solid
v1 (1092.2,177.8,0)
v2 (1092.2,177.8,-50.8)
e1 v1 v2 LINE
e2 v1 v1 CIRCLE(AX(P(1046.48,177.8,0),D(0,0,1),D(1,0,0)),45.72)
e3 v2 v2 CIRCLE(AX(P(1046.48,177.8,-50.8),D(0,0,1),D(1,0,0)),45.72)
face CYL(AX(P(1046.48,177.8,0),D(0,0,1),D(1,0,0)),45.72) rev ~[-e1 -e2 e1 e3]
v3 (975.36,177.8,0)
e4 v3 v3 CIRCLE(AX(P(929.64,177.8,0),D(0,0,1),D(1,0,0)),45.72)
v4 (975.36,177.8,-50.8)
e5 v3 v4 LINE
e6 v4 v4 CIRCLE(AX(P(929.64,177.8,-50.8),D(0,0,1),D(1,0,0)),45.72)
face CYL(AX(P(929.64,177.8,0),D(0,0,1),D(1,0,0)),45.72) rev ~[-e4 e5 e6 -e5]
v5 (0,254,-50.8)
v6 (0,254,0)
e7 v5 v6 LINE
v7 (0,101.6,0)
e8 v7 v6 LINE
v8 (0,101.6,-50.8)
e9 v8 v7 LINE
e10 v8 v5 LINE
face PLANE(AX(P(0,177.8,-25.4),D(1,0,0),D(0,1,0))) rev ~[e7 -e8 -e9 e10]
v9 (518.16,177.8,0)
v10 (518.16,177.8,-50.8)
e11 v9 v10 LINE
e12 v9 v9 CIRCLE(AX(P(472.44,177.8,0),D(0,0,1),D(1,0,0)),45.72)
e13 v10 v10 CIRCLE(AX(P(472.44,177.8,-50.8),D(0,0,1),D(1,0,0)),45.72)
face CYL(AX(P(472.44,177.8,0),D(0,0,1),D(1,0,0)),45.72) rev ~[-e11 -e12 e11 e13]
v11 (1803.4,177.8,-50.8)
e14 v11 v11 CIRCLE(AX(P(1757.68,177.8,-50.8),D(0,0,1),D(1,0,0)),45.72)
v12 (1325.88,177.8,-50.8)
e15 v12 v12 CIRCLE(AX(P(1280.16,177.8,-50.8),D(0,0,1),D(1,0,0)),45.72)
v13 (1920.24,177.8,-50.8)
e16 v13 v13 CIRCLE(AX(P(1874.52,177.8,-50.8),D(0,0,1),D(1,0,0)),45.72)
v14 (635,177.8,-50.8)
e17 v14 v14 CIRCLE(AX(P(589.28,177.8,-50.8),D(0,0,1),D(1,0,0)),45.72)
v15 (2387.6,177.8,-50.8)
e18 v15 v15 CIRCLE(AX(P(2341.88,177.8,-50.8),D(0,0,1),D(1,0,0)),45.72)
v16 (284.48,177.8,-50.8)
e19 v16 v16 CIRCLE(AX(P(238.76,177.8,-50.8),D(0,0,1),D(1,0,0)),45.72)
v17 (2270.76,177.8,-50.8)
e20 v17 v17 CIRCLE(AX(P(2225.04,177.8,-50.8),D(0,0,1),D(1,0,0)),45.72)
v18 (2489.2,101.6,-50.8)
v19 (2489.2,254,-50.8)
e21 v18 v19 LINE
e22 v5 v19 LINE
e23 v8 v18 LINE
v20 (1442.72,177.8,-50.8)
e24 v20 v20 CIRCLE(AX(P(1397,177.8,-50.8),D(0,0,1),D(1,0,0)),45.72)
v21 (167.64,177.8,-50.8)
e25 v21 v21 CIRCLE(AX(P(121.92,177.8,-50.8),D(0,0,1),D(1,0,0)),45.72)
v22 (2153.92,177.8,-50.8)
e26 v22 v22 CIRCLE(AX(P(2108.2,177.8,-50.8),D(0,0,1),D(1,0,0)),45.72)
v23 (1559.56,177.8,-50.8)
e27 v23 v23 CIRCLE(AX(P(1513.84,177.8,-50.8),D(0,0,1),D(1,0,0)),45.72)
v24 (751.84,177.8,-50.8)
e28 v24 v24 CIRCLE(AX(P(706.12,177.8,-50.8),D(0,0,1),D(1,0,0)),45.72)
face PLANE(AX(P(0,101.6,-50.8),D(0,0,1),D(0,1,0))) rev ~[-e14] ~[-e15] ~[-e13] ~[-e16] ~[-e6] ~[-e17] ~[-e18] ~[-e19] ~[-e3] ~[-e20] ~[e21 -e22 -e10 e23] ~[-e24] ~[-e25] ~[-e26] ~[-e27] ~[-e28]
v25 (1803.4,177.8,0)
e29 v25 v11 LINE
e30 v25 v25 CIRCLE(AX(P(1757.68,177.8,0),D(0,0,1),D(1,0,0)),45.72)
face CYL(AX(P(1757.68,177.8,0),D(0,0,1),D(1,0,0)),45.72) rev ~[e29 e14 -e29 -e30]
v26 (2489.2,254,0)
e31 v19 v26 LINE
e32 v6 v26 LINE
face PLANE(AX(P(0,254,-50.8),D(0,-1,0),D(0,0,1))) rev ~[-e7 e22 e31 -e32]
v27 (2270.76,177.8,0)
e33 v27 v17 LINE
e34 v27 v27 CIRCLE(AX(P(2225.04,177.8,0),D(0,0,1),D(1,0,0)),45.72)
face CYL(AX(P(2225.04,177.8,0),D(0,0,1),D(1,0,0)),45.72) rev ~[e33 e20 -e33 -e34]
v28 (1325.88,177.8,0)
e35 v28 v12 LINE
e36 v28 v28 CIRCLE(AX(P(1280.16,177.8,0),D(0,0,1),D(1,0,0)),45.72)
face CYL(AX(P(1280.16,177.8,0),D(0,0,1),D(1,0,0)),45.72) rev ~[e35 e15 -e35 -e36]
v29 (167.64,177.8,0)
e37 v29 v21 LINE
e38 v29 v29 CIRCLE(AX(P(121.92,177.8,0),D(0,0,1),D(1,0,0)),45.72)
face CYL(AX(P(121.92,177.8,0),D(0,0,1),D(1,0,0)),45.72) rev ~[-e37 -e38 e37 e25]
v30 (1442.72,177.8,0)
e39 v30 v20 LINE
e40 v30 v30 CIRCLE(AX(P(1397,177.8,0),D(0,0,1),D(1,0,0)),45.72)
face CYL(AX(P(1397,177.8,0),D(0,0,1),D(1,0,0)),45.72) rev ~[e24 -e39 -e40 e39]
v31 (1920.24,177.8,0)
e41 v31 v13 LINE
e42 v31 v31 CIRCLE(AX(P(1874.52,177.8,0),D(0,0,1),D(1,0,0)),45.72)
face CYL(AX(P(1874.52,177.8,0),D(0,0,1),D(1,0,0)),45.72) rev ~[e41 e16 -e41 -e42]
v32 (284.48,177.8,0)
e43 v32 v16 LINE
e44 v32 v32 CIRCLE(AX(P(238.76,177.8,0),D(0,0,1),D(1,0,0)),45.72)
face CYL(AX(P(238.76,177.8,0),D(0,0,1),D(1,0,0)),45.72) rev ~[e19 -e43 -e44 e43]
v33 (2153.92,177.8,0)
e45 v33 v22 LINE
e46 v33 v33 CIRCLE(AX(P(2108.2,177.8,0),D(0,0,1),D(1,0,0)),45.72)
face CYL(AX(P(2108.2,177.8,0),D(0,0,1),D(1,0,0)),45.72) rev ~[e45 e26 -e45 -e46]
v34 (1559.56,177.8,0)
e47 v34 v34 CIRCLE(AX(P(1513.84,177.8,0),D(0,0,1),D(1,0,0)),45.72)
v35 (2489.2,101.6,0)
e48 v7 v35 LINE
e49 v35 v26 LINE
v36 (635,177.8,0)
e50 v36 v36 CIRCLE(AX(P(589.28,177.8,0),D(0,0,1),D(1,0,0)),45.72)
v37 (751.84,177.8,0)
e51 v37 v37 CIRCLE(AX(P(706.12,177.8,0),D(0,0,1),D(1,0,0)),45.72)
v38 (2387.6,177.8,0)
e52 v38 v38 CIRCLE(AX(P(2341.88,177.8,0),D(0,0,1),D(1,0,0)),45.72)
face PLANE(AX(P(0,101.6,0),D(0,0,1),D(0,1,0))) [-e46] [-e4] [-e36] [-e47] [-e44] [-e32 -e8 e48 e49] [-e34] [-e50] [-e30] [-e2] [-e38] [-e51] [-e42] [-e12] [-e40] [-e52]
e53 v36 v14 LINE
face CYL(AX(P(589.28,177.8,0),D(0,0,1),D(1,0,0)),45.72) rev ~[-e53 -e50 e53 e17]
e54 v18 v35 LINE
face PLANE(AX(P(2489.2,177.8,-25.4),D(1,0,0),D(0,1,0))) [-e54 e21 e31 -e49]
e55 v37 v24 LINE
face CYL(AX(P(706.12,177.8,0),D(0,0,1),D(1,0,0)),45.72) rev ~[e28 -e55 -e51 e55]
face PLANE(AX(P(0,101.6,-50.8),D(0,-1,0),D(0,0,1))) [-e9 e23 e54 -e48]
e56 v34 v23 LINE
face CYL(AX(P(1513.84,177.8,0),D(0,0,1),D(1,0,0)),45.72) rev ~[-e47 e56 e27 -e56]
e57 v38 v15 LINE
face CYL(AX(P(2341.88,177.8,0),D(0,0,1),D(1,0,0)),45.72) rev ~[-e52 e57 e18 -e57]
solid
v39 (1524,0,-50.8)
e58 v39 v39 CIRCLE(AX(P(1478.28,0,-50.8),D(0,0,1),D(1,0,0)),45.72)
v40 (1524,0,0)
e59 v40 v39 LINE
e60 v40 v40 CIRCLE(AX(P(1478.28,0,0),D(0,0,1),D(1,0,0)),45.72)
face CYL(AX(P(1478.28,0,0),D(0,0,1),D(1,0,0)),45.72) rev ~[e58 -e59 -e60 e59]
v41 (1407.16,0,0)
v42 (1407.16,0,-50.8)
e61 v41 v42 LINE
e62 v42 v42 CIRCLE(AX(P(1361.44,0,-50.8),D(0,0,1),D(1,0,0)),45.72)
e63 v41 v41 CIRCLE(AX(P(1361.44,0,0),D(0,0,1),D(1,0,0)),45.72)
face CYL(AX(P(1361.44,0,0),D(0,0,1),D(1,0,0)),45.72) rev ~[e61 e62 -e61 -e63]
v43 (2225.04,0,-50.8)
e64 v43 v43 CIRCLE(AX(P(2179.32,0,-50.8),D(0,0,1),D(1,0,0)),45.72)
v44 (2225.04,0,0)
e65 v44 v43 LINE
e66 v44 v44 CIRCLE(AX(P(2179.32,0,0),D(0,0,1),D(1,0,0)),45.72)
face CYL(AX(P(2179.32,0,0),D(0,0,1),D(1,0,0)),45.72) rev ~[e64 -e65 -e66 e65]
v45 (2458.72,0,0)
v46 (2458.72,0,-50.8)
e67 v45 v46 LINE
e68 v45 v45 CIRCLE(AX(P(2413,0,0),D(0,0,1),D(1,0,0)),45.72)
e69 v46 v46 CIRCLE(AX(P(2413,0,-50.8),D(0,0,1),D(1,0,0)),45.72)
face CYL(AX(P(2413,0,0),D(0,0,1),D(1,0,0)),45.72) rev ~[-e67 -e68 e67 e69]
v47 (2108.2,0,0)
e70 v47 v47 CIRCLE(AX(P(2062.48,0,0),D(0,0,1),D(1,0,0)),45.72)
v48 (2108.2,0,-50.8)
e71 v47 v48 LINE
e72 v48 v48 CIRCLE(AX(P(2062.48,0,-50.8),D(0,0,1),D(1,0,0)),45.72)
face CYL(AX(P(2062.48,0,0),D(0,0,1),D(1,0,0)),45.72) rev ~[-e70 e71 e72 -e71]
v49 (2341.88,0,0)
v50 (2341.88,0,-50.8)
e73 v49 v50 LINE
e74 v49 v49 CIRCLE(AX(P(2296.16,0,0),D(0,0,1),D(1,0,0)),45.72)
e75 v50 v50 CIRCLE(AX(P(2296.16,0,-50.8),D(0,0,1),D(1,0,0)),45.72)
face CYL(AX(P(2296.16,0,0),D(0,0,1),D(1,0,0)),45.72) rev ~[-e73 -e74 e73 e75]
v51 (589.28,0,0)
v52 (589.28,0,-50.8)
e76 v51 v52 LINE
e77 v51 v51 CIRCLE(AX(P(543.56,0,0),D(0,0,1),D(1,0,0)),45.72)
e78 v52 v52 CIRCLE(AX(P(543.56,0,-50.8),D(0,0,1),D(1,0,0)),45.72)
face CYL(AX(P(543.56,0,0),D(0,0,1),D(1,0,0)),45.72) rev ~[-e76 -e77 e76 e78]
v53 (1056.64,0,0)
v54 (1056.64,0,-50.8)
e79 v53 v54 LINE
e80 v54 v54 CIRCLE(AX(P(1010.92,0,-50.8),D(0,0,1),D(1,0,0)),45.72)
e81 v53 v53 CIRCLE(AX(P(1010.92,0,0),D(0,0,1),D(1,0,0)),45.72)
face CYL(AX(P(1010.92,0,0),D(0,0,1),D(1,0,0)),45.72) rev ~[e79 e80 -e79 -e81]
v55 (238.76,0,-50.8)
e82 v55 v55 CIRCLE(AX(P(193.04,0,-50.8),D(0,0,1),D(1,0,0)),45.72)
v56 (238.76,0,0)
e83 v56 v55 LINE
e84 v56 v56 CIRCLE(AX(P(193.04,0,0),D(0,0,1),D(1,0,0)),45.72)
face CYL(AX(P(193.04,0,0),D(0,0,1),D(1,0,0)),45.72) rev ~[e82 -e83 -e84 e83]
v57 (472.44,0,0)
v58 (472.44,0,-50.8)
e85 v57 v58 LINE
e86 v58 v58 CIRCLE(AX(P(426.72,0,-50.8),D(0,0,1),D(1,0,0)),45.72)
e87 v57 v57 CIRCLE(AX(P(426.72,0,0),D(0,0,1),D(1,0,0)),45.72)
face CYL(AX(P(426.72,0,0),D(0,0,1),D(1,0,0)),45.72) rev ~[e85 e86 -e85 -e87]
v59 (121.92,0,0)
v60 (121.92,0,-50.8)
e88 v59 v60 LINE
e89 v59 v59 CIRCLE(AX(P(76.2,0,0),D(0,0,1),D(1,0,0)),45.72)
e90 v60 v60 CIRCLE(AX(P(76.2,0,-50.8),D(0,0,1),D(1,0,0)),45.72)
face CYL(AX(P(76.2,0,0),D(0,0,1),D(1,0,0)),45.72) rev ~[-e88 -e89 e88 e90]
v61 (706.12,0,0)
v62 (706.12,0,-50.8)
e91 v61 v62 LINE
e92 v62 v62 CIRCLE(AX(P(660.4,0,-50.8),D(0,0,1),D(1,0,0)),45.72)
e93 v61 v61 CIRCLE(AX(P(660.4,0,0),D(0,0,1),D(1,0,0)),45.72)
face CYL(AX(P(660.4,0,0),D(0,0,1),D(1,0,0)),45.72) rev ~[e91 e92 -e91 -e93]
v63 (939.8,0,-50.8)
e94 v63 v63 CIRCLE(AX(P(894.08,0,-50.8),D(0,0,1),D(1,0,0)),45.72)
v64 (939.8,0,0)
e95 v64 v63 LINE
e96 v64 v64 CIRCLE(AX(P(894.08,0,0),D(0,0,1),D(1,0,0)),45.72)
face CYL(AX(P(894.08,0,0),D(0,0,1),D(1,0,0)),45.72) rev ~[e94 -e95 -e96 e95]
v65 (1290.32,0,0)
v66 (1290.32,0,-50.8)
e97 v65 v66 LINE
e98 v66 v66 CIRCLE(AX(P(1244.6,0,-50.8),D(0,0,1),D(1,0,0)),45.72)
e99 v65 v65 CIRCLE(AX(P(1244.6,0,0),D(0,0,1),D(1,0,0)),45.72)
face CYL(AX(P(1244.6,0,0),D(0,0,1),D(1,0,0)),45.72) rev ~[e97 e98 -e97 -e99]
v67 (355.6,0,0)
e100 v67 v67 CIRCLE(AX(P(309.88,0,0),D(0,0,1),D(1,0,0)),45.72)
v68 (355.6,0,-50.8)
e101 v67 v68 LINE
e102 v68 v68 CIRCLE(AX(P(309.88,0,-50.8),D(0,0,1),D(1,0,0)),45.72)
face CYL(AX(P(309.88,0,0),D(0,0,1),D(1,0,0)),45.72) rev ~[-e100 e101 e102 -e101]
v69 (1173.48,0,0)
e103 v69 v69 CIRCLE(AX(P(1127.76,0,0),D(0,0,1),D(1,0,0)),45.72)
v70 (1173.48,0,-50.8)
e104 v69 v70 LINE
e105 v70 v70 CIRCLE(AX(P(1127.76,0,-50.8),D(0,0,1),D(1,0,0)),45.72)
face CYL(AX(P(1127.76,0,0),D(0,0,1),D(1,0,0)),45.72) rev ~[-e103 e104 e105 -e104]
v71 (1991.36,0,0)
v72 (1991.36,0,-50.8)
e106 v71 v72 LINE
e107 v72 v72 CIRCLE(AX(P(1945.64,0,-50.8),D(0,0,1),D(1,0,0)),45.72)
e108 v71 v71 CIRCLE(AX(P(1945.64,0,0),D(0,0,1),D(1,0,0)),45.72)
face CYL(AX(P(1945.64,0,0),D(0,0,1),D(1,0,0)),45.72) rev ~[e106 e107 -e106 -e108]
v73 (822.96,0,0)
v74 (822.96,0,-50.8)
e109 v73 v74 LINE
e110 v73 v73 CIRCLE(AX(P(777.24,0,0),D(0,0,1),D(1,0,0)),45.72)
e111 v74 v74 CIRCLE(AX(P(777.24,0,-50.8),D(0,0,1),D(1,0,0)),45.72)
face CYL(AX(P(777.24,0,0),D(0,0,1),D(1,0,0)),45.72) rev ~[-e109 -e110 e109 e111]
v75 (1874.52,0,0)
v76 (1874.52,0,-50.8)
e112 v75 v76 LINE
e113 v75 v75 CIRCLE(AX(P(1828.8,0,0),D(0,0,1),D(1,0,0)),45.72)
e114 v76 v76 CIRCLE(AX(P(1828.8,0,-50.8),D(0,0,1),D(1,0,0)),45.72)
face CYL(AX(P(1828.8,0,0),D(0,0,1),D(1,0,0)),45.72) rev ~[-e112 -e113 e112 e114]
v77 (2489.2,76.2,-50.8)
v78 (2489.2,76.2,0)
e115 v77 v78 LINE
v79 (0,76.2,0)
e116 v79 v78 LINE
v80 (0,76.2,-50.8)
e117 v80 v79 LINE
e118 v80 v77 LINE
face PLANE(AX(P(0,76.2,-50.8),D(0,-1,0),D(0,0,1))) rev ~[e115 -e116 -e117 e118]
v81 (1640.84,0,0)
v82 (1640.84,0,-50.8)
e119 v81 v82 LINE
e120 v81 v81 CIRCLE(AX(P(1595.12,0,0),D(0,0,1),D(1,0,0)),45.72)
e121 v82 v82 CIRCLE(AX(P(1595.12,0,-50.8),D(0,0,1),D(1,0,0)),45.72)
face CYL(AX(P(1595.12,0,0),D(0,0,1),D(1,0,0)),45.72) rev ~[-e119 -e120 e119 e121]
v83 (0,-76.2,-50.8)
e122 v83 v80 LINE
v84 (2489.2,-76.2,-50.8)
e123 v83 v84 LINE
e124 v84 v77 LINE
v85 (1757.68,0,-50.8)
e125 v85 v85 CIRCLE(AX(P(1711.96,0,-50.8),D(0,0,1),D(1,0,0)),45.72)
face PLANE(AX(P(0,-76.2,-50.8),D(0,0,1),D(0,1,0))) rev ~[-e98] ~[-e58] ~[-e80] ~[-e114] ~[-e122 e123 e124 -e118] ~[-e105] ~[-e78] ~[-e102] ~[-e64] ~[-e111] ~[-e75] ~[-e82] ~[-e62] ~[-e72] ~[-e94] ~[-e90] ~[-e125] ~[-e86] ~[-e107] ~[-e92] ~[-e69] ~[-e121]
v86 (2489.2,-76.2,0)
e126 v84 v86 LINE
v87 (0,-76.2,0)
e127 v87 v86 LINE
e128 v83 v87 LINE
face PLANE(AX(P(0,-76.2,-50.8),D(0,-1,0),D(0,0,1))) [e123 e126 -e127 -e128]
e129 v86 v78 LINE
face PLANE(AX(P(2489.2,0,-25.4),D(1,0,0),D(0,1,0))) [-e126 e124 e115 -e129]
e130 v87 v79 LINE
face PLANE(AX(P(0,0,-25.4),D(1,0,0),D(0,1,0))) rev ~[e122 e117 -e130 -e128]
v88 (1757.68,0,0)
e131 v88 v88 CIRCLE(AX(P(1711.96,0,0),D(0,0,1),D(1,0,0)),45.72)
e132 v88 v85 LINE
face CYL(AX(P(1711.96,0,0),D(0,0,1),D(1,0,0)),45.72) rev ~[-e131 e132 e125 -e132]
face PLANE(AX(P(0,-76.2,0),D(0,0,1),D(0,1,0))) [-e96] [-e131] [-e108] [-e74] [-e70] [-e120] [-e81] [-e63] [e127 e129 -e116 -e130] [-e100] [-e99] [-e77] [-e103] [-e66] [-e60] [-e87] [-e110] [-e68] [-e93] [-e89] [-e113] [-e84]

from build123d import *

# Parameters (mm, degrees)
F0_W     = 152.4
F0_H     = 50.8
F1_DEPTH = 2489.2
F2_R     = 45.72
F3_DEPTH = 63.5
F4_DEPTH = 63.5


# Not quite as in the source:
# - a feature names something its author has since deleted; it is built from what else it names


with BuildPart() as f1:
    # F0 (on Right) → F1 (new body)
    with BuildSketch(Plane.YZ):
        with Locations((0, -25.4)):
            Rectangle(F0_W, F0_H)
    extrude(amount=F1_DEPTH)

    # F2 (on Top) → F3 (cut)
    with BuildSketch(Plane.XY):
        with Locations((76.2, 0)):
            Circle(F2_R)
        with Locations((193.04, 0)):
            Circle(F2_R)
        with Locations((309.88, 0)):
            Circle(F2_R)
        with Locations((426.72, 0)):
            Circle(F2_R)
        with Locations((543.56, 0)):
            Circle(F2_R)
        with Locations((660.4, 0)):
            Circle(F2_R)
        with Locations((777.24, 0)):
            Circle(F2_R)
        with Locations((894.08, 0)):
            Circle(F2_R)
        with Locations((1010.92, 0)):
            Circle(F2_R)
        with Locations((1127.76, 0)):
            Circle(F2_R)
        with Locations((1244.6, 0)):
            Circle(F2_R)
        with Locations((1361.44, 0)):
            Circle(F2_R)
        with Locations((1595.12, 0)):
            Circle(F2_R)
        with Locations((1711.96, 0)):
            Circle(F2_R)
        with Locations((1828.8, 0)):
            Circle(F2_R)
        with Locations((1945.64, 0)):
            Circle(F2_R)
        with Locations((2062.48, 0)):
            Circle(F2_R)
        with Locations((1478.28, 0)):
            Circle(F2_R)
        with Locations((2179.32, 0)):
            Circle(F2_R)
        with Locations((2296.16, 0)):
            Circle(F2_R)
        with Locations((2413, 0)):
            Circle(F2_R)
    extrude(amount=-F3_DEPTH, mode=Mode.SUBTRACT)


with BuildPart() as f1b:
    # F0 (on Right) → F1, piece 2 (new body)
    with BuildSketch(Plane.YZ):
        with Locations((177.8, -25.4)):
            Rectangle(F0_W, F0_H)
    extrude(amount=F1_DEPTH)

    # F2 (on Top) → F4 (cut)
    with BuildSketch(Plane.XY):
        with Locations((121.92, 177.8)):
            Circle(F2_R)
        with Locations((238.76, 177.8)):
            Circle(F2_R)
        with Locations((472.44, 177.8)):
            Circle(F2_R)
        with Locations((589.28, 177.8)):
            Circle(F2_R)
        with Locations((706.12, 177.8)):
            Circle(F2_R)
        with Locations((929.64, 177.8)):
            Circle(F2_R)
        with Locations((1046.48, 177.8)):
            Circle(F2_R)
        with Locations((1280.16, 177.8)):
            Circle(F2_R)
        with Locations((1397, 177.8)):
            Circle(F2_R)
        with Locations((1513.84, 177.8)):
            Circle(F2_R)
        with Locations((1757.68, 177.8)):
            Circle(F2_R)
        with Locations((1874.52, 177.8)):
            Circle(F2_R)
        with Locations((2341.88, 177.8)):
            Circle(F2_R)
        with Locations((2225.04, 177.8)):
            Circle(F2_R)
        with Locations((2108.2, 177.8)):
            Circle(F2_R)
    extrude(amount=-F4_DEPTH, mode=Mode.SUBTRACT)


solid = Compound([f1.part, f1b.part])
